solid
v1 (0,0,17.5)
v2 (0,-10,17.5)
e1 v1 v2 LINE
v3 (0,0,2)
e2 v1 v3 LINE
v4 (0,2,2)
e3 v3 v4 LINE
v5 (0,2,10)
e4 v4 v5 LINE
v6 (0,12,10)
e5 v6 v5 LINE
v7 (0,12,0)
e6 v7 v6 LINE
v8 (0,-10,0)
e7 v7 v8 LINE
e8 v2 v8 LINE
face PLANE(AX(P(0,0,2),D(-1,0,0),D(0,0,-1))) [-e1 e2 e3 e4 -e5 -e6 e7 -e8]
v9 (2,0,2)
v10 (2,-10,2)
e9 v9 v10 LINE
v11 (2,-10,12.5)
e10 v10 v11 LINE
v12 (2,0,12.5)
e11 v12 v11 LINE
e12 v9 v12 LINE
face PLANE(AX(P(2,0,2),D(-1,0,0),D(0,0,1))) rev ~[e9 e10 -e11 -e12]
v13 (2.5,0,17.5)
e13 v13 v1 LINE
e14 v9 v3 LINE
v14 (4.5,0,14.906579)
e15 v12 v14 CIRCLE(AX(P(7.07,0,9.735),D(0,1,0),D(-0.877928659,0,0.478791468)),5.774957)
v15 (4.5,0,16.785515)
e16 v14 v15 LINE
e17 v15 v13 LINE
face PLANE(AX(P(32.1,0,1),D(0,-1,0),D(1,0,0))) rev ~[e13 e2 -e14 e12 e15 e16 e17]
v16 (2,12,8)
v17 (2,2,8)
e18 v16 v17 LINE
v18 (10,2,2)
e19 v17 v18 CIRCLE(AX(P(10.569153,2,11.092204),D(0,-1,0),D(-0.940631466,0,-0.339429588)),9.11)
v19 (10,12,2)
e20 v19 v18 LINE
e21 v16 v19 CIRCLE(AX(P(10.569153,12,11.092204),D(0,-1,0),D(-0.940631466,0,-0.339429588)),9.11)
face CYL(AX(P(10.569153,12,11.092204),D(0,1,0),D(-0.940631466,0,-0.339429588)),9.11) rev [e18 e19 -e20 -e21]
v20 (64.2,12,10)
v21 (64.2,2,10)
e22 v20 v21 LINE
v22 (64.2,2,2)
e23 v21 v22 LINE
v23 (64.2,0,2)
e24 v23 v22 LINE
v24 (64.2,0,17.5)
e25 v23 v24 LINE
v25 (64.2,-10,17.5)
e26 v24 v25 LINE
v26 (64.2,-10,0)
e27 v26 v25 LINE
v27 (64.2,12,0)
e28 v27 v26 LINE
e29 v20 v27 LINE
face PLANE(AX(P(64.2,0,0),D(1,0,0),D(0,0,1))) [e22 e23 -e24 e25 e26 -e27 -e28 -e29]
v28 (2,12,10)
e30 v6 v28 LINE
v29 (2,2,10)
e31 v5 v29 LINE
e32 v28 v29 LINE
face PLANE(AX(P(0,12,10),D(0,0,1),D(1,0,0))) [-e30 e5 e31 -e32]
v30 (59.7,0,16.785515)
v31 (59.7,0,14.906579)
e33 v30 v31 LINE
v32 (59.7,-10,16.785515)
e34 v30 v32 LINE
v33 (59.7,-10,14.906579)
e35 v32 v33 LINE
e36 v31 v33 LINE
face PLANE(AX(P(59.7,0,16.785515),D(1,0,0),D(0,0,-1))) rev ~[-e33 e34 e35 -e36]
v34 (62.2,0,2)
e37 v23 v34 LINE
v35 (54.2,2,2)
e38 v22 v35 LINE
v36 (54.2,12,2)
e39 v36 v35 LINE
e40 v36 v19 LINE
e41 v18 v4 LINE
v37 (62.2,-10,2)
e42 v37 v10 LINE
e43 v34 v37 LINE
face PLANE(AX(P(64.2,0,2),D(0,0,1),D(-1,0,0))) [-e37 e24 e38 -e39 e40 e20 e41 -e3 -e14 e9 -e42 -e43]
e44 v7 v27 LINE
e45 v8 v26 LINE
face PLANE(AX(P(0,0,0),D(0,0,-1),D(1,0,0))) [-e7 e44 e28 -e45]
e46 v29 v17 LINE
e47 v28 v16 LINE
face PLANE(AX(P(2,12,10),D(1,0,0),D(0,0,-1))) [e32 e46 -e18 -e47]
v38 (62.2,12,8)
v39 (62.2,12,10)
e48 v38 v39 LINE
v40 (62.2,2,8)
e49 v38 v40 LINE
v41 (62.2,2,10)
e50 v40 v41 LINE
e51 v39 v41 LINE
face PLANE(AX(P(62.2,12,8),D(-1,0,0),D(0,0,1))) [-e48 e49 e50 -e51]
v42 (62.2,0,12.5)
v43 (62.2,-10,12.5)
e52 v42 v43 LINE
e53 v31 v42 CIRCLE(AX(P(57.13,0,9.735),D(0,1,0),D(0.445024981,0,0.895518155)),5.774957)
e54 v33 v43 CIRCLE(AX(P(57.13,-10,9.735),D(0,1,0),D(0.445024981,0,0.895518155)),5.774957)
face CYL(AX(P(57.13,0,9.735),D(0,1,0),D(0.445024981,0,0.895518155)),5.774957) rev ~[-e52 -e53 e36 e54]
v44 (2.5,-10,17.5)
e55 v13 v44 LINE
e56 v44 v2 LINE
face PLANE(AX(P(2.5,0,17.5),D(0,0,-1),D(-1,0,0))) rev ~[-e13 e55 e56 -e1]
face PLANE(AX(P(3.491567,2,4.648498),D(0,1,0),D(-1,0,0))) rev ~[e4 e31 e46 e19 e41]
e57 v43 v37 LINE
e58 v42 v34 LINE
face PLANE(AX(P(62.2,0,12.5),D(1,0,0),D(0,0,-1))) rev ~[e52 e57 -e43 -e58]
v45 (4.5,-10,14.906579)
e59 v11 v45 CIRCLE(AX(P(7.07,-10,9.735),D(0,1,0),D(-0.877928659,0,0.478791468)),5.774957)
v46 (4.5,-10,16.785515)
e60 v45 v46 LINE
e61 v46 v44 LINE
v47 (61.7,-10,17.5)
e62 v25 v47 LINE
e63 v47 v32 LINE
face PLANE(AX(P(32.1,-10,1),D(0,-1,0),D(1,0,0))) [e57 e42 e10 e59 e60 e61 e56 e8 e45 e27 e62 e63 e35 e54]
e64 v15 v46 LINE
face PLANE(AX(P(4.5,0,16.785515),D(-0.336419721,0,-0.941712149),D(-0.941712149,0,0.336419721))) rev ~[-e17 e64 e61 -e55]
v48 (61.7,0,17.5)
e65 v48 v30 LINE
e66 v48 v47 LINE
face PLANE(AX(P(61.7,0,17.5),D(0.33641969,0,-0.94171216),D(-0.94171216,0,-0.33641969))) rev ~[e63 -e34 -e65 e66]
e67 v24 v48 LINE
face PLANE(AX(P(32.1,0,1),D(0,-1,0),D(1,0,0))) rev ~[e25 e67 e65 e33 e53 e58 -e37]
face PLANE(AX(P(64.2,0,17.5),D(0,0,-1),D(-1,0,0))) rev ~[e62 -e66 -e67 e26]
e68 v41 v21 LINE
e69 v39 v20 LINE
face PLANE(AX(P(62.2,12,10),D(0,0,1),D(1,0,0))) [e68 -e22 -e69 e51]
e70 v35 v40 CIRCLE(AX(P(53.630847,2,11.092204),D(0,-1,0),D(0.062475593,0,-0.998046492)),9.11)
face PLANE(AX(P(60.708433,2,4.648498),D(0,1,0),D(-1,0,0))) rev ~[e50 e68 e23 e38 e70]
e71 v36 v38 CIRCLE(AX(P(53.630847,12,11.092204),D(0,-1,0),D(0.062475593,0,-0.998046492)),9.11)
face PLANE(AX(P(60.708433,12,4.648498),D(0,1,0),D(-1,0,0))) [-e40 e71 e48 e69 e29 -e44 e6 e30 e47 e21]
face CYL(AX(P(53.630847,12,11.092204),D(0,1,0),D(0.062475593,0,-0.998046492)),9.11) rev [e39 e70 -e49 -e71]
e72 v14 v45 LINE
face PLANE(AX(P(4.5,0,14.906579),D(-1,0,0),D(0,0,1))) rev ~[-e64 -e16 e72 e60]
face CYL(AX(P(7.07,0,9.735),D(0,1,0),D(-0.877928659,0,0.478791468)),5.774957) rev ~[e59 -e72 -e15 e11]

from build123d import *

# Parameters (mm, degrees)
F1_DEPTH = 10
F2_DEPTH = 12
F4_DEPTH = 10


# Not quite as in the source:
# - ends of sketch curves that miss each other by under 0.0002 mm in the source are joined


with BuildPart() as f1:
    # F0 (on Front) → F1 (new body)
    with BuildSketch(Plane.XZ):
        Polygon((0, 2), (0, 0), (64.2, 0), (64.2, 2), (62.2, 2), (2, 2), align=None)
        with BuildLine():
            Line((0, 17.5), (0, 2))
            Line((0, 2), (2, 2))
            Line((2, 2), (2, 12.5))
            ThreePointArc((2, 12.5), (3.0649650296, 13.8955071669), (4.5, 14.9065785791))
            Line((4.5, 14.9065785791), (4.5, 16.7855147476))
            Line((4.5, 16.7855147476), (2.5, 17.5))
            Line((2.5, 17.5), (0, 17.5))
        make_face()
        with BuildLine():
            Line((62.2, 2), (64.2, 2))
            Line((64.2, 2), (64.2, 17.5))
            Line((64.2, 17.5), (61.7, 17.5))
            Line((61.7, 17.5), (59.7, 16.7855148221))
            Line((59.7, 16.7855148221), (59.7, 14.9065787654))
            ThreePointArc((59.7, 14.9065787654), (61.1350349704, 13.8955073531), (62.2, 12.5000001863))
            Line((62.2, 12.5000001863), (62.2, 2))
        make_face()
    extrude(amount=F1_DEPTH)

    # F0 (on Front) → F2 (join)
    with BuildSketch(Plane.XZ):
        Polygon((0, 2), (0, 0), (64.2, 0), (64.2, 2), (62.2, 2), (2, 2), align=None)
    extrude(amount=-F2_DEPTH)

    # F3 (on face) → F4 (join)
    with BuildSketch(Plane(origin=(0, 12, 0), x_dir=(-1, 0, 0), z_dir=(0, 1, 0))):
        with BuildLine():
            Line((-64.2, 2), (-54.2, 2))
            ThreePointArc((-54.2, 2), (-59.0968473433, 3.8042035422), (-62.2, 8))
            Line((-62.2, 8), (-62.2, 10))
            Line((-62.2, 10), (-64.2, 10))
            Line((-64.2, 10), (-64.2, 2))
        make_face()
        with BuildLine():
            Line((-10, 2), (0, 2))
            Line((0, 2), (0, 10))
            Line((0, 10), (-2, 10))
            Line((-2, 10), (-2, 8))
            ThreePointArc((-2, 8), (-5.1031526567, 3.8042035422), (-10, 2))
        make_face()
    extrude(amount=-F4_DEPTH)


solid = f1.part
